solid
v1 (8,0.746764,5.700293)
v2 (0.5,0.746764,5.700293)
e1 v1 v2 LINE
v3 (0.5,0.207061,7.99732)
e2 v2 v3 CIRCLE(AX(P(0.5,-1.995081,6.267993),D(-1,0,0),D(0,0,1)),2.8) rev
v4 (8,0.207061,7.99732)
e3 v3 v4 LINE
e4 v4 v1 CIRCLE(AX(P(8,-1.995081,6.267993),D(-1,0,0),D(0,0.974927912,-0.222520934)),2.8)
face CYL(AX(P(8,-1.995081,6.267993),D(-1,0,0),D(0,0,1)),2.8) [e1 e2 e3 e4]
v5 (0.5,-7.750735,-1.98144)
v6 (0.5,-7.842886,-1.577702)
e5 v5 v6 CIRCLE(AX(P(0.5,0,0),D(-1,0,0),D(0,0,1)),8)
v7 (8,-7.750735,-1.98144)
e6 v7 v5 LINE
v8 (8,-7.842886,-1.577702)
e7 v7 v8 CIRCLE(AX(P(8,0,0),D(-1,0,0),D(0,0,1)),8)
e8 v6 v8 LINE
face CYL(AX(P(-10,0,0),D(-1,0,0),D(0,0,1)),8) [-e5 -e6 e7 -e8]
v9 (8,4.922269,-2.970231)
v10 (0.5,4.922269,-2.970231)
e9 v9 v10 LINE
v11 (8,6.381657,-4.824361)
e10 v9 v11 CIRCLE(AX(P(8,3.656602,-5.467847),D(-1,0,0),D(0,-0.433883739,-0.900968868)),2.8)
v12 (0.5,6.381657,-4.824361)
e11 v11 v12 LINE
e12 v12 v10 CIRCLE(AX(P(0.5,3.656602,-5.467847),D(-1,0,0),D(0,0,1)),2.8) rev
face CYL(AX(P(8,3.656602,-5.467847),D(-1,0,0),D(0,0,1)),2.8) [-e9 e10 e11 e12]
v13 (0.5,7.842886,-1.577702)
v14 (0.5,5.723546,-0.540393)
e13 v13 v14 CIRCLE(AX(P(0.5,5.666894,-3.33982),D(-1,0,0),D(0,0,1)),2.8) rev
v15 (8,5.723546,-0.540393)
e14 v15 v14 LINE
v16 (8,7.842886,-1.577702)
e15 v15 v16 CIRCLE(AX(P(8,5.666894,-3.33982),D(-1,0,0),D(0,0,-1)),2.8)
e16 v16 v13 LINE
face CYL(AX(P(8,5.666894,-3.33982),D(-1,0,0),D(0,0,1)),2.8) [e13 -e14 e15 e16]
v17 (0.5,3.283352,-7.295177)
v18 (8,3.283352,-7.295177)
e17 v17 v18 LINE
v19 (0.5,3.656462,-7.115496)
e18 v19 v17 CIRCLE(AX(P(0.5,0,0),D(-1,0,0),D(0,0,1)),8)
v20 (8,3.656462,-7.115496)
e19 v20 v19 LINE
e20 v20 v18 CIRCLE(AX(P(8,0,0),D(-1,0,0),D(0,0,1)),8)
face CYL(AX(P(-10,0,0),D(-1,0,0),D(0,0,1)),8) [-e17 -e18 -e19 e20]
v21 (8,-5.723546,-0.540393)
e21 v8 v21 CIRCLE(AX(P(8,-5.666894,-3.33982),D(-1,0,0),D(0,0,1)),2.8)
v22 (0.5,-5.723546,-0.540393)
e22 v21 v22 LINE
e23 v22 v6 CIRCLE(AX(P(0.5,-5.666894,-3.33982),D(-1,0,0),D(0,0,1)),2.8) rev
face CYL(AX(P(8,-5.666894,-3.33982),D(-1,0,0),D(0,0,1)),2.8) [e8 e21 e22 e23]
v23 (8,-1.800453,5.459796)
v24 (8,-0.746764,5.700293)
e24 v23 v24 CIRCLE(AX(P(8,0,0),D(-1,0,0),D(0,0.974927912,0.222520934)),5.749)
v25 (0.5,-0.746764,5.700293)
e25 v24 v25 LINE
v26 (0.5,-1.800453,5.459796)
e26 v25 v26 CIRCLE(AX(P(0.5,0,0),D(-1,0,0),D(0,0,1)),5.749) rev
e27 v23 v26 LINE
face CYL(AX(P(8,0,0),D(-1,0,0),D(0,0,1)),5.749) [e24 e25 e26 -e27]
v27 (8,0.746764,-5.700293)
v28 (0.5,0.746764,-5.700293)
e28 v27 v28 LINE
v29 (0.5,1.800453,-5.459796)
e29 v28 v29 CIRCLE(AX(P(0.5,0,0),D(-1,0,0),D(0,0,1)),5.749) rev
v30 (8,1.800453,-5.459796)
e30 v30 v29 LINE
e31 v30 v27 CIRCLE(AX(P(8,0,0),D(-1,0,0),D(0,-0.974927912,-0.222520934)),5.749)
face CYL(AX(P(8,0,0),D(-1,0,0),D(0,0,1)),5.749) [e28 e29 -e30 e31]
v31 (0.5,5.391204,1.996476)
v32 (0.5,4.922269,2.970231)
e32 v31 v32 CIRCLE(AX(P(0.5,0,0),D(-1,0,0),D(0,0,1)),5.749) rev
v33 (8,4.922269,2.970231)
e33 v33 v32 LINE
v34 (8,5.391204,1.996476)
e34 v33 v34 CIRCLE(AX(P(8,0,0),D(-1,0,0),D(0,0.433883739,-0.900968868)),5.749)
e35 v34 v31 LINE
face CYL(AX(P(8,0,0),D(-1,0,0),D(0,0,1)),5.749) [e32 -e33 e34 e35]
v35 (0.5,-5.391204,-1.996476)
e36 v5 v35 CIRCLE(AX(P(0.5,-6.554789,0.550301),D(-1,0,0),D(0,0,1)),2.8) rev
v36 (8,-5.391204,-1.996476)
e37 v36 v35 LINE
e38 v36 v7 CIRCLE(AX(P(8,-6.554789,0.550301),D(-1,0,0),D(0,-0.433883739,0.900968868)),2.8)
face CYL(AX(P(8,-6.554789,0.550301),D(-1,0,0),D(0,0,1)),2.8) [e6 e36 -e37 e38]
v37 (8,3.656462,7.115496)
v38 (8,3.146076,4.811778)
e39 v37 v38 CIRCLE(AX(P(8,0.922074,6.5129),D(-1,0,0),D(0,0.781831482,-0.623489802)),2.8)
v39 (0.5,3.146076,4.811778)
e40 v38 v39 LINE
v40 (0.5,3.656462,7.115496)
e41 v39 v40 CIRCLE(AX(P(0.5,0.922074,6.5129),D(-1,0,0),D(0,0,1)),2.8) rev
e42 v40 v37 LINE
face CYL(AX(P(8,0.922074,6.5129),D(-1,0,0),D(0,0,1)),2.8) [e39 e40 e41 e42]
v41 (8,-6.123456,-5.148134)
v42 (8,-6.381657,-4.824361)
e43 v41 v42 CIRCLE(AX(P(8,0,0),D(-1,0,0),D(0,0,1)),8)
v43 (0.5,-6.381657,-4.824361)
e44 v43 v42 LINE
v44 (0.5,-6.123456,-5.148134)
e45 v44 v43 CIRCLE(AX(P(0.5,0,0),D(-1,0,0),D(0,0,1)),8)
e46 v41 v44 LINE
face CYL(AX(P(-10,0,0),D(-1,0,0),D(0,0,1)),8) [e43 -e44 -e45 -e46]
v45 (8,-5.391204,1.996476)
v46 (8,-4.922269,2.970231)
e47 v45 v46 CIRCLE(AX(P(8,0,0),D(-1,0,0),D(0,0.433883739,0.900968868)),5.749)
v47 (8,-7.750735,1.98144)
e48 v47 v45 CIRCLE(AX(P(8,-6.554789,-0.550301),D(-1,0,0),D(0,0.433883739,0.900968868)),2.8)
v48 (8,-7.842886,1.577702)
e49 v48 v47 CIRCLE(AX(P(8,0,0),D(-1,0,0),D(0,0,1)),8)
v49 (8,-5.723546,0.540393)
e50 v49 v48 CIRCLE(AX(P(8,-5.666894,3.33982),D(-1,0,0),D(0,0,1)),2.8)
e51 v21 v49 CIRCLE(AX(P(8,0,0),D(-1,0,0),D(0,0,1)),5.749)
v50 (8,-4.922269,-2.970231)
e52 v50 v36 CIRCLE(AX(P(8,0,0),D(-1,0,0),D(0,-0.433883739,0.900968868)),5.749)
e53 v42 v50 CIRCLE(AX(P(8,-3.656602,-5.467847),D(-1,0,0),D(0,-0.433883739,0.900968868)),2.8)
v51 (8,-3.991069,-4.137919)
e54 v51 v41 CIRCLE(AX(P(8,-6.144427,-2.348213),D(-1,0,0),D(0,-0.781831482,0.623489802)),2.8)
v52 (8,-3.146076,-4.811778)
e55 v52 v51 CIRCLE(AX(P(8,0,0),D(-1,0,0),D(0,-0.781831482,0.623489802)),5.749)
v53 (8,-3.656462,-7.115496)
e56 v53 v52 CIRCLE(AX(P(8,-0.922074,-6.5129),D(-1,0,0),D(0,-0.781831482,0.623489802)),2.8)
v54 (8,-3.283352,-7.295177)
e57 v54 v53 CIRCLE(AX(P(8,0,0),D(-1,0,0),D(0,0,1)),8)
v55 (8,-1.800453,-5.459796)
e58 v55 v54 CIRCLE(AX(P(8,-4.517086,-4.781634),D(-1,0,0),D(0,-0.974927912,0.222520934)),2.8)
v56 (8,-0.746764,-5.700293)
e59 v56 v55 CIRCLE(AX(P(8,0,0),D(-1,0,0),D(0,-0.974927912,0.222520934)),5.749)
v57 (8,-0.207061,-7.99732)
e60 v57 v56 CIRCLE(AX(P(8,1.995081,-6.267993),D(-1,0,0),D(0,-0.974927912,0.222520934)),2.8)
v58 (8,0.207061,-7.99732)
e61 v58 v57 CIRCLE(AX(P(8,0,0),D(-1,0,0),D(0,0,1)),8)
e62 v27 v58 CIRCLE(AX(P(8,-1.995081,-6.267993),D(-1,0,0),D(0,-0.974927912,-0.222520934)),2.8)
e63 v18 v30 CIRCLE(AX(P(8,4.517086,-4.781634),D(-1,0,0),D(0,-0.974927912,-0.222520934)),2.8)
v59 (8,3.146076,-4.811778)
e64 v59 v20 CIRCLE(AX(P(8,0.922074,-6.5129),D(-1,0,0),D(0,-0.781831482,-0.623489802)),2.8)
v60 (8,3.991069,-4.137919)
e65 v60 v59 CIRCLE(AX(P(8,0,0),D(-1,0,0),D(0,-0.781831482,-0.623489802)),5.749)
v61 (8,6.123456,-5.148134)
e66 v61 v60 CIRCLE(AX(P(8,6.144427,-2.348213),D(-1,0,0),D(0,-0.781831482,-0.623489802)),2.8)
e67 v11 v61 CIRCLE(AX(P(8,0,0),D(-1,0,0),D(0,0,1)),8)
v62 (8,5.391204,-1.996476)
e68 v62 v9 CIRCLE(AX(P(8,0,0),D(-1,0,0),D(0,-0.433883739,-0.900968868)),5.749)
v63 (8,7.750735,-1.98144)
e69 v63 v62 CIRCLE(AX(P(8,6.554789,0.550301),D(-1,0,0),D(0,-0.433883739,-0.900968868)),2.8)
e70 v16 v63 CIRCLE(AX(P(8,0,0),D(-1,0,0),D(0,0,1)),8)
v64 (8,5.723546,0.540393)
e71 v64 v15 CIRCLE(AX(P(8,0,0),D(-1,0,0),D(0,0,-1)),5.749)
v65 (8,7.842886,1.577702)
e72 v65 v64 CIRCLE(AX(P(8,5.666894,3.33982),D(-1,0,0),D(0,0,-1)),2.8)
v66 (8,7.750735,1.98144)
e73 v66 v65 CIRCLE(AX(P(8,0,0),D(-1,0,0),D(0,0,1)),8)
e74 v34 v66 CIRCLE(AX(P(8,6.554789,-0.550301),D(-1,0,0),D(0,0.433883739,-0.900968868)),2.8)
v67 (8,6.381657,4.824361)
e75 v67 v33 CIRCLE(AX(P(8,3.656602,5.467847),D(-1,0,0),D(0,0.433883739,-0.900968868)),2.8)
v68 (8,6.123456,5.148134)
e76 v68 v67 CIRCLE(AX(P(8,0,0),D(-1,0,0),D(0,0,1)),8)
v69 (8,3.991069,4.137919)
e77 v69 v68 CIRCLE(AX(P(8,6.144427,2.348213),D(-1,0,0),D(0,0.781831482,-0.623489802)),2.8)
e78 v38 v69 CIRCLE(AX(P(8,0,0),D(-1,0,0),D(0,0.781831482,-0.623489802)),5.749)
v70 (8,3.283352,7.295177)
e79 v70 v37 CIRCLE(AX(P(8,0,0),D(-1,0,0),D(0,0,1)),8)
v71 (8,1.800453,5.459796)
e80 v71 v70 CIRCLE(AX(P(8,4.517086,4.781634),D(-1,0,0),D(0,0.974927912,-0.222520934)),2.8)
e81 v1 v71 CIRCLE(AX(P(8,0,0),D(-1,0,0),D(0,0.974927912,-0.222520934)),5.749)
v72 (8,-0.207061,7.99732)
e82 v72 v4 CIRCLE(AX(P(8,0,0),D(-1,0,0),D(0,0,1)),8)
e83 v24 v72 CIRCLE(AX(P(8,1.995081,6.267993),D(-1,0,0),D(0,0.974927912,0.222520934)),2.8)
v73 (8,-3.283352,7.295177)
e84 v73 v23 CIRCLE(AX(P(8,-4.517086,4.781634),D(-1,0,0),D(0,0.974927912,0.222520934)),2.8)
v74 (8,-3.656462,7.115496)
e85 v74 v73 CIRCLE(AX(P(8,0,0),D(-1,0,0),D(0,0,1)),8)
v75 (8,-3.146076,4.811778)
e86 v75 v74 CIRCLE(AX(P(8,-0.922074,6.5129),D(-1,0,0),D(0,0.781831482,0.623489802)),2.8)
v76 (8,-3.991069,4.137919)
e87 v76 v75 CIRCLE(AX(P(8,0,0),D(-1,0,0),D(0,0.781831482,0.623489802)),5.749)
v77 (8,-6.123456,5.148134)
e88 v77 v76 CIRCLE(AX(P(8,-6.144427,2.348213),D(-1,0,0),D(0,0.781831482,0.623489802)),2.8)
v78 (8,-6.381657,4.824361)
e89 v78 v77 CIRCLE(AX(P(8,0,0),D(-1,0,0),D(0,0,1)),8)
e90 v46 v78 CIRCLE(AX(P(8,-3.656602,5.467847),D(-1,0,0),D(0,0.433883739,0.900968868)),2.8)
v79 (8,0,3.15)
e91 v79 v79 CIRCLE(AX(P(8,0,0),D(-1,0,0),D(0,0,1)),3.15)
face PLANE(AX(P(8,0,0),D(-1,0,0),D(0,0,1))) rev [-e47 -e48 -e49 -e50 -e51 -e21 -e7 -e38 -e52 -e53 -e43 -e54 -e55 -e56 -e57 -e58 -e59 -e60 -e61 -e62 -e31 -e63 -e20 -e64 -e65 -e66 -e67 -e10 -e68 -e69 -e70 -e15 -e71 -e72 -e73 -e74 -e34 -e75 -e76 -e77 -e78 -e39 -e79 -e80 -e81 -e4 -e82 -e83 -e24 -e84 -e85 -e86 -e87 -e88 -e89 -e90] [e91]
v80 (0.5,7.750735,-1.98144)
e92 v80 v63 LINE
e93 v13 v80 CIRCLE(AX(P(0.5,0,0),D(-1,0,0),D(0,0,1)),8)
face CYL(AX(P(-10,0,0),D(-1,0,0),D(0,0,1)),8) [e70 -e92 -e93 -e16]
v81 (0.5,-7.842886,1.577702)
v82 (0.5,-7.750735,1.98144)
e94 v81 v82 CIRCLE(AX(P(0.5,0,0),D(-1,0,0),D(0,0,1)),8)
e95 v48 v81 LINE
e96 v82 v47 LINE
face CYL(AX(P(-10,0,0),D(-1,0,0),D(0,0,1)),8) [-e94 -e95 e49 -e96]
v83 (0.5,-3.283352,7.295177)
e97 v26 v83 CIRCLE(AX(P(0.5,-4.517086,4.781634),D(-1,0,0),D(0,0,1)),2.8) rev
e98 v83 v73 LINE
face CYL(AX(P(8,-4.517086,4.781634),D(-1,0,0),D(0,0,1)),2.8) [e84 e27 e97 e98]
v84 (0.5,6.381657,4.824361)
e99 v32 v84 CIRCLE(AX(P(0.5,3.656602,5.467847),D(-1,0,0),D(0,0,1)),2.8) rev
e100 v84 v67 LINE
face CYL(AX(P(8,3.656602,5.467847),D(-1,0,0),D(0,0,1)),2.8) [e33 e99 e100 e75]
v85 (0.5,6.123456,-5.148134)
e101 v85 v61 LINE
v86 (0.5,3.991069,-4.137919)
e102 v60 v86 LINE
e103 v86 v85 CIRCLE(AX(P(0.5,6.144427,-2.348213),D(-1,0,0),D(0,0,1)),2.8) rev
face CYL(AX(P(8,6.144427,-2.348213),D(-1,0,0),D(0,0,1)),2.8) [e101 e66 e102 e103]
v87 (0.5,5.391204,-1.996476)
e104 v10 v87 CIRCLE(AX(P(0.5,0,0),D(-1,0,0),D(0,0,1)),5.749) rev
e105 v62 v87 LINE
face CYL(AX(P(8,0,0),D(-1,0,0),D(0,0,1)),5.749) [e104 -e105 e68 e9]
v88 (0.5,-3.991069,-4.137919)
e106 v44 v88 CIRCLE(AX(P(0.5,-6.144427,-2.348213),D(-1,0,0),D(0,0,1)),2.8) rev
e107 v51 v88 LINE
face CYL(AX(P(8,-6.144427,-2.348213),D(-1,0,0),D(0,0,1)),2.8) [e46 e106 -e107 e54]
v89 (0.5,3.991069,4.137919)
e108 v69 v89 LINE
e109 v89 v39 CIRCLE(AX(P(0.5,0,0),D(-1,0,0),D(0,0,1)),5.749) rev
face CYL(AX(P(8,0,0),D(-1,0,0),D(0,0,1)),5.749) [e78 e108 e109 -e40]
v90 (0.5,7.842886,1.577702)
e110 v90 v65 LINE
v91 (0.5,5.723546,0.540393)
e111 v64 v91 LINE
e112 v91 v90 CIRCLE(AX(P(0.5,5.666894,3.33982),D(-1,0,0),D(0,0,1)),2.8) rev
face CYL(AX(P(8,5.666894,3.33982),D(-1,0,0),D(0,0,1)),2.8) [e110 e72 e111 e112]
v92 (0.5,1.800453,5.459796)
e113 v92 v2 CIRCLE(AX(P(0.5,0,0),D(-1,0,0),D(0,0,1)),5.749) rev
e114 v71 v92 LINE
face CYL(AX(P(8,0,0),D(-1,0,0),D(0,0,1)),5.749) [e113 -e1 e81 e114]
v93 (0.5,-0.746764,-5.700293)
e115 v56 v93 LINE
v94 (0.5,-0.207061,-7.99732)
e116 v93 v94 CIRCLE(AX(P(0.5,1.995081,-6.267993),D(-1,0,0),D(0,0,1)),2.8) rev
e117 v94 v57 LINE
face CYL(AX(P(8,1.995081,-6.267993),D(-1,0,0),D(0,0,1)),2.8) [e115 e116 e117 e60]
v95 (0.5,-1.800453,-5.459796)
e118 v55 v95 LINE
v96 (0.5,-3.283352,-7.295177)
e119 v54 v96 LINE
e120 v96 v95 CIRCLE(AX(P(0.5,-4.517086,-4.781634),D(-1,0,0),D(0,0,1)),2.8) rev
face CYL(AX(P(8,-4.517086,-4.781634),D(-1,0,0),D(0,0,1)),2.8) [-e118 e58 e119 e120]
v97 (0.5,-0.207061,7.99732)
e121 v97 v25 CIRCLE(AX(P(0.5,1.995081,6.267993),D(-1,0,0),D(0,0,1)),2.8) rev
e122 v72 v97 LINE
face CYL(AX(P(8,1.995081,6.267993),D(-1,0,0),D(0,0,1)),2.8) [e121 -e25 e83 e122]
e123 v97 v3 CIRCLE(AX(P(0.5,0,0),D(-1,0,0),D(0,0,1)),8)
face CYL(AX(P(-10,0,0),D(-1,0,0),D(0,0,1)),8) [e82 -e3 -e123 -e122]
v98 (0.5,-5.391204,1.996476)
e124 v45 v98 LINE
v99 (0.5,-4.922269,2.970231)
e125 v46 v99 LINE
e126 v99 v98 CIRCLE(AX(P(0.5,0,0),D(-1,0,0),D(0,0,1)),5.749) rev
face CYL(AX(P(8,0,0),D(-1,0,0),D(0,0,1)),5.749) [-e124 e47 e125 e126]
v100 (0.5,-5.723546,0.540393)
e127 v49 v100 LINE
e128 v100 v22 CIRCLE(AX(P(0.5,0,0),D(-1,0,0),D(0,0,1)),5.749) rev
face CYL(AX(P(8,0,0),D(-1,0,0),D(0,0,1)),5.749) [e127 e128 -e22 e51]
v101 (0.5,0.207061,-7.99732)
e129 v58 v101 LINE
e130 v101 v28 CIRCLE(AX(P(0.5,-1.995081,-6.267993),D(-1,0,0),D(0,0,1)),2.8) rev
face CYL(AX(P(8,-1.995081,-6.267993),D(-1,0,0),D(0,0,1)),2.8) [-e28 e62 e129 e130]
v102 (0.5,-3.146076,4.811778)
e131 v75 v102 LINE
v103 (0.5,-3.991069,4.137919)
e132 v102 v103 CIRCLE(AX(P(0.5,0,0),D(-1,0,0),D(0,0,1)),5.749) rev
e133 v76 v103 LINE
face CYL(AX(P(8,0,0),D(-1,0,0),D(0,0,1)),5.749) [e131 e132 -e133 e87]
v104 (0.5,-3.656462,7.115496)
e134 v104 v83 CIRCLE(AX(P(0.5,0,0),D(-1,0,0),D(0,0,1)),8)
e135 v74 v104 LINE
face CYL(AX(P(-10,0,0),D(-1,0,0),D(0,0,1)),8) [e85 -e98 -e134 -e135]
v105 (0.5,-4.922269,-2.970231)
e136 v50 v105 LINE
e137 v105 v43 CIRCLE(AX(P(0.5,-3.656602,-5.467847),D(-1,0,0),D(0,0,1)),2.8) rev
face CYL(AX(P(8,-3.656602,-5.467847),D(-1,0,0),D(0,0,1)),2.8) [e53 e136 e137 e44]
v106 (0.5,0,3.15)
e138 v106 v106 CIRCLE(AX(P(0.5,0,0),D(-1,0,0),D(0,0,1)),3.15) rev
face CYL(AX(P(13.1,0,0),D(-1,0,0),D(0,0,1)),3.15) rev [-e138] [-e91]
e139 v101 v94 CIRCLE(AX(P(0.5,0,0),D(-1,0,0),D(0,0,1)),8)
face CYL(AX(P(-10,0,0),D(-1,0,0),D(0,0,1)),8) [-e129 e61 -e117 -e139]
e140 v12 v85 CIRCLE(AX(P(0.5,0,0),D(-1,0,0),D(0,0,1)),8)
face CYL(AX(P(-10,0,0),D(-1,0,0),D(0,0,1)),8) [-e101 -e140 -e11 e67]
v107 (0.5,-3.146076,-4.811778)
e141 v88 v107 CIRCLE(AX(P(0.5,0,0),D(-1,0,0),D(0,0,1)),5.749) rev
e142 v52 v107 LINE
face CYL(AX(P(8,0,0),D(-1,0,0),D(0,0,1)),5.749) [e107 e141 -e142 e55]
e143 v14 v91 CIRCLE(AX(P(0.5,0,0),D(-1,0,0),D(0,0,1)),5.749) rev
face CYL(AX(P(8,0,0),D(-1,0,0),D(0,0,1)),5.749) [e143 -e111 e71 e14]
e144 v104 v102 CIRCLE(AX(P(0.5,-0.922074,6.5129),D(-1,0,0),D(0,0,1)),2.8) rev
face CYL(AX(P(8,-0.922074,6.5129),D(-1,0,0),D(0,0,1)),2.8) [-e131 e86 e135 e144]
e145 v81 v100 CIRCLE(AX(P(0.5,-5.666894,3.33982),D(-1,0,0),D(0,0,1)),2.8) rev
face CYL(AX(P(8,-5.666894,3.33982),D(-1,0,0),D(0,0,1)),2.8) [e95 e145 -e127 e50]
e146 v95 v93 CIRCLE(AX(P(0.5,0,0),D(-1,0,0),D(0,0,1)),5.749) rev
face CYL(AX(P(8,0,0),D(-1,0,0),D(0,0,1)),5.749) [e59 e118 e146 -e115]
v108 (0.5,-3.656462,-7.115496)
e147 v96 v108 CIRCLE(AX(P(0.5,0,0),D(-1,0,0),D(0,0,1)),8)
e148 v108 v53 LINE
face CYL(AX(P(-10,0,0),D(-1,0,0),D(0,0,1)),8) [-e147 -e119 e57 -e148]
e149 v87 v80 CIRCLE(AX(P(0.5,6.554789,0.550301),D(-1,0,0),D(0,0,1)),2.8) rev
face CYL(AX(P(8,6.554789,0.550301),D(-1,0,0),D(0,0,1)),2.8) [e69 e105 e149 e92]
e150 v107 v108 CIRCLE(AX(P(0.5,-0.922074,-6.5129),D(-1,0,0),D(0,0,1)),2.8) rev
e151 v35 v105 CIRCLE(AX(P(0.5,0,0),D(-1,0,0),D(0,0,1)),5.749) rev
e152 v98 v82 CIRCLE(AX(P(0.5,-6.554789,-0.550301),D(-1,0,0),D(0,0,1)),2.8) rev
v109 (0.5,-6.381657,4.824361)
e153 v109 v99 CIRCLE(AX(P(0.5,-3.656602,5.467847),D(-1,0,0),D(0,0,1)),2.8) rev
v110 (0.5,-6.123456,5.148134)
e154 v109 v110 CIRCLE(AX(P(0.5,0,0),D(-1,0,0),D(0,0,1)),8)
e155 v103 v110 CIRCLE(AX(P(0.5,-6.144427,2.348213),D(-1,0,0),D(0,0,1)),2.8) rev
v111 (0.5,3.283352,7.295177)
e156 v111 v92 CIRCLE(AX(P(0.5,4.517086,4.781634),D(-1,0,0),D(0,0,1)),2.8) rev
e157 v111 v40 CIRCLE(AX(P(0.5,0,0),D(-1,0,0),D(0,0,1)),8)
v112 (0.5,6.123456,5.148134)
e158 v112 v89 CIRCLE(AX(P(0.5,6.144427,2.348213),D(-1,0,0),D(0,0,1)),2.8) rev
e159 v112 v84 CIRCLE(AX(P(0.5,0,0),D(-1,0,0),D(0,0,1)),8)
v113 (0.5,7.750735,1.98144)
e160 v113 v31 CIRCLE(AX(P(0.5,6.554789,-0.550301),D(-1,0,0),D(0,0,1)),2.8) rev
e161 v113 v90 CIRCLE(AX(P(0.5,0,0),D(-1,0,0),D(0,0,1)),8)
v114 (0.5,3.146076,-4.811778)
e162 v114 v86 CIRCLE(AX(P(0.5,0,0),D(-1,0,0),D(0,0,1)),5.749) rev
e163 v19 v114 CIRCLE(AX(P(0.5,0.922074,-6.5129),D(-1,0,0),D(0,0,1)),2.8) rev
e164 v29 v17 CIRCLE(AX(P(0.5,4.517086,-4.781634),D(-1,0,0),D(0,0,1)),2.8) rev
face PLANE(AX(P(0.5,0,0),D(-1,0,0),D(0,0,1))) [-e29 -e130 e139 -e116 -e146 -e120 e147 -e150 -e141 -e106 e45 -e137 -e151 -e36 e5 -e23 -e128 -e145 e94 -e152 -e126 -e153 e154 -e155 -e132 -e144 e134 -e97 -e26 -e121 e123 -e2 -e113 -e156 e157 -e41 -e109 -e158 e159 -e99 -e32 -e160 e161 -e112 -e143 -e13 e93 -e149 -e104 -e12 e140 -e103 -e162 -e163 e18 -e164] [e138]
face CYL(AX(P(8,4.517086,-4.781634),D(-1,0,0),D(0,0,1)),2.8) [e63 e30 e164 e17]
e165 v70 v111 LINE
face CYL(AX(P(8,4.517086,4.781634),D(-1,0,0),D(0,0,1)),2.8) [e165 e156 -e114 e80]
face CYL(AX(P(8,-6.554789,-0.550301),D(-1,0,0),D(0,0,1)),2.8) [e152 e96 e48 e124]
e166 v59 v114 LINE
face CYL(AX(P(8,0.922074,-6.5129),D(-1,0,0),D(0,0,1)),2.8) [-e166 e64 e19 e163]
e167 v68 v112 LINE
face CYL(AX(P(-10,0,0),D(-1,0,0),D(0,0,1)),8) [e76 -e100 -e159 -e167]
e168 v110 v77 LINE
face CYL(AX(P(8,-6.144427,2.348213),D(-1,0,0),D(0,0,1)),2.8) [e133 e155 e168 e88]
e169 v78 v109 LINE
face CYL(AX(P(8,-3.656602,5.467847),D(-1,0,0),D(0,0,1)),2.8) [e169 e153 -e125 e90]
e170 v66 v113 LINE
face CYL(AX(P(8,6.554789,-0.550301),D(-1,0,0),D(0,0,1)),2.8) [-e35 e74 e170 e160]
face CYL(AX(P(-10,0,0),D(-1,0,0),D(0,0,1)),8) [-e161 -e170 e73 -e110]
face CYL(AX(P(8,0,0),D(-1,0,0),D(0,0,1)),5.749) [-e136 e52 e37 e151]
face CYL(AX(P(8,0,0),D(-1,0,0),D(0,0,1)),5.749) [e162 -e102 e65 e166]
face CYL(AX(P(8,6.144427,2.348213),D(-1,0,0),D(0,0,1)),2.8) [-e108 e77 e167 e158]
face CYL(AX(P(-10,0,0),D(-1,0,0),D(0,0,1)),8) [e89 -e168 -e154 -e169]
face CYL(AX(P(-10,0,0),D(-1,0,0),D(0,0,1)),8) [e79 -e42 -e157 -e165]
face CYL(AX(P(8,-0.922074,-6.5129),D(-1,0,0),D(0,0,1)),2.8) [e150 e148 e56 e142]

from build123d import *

# Parameters (mm, degrees)
BOSS_EXTRUDE1_START       = -4.9
BOSS_EXTRUDE1_DEPTH       = 4.9
BOSS_EXTRUDE1_START_2     = -8
BOSS_EXTRUDE1_2_OUTLINE_R = 5
BOSS_EXTRUDE1_2_DEPTH     = 3.1
SKETCH2_R                 = 5.05
CUT_EXTRUDE1_DEPTH        = 3.1
SKETCH3_R                 = 3.25
CUT_EXTRUDE2_DEPTH        = 13.227872143
SKETCH4_R                 = 4
CUT_EXTRUDE3_DEPTH        = 10
SKETCH5_R                 = 4
SKETCH5_R_2               = 3
BOSS_EXTRUDE2_DEPTH       = 4.9
BOSS_EXTRUDE3_DEPTH       = 1
BOSS_EXTRUDE3_DEPTH_BACK  = 1
FILLET1_R                 = 1
SKETCH8_R                 = 3.15
CUT_EXTRUDE4_DEPTH        = 10
BOSS_EXTRUDE4_START       = 3.1
SKETCH9_R                 = 5.05
SKETCH9_R_2               = 3.15
BOSS_EXTRUDE4_DEPTH       = 3.1
SKETCH10_R                = 9.67908905
CUT_EXTRUDE5_DEPTH        = 0.5


with BuildPart() as part:
    # Boss-Extrude1: read off the stored shape, not the designer's step
    # Boss-Extrude1 outline → Boss-Extrude1 (new body)
    with BuildSketch(Plane(origin=(8, 0, 0), x_dir=(0, 0, -1), z_dir=(1, 0, 0)).offset(BOSS_EXTRUDE1_START)):
        with BuildLine():
            ThreePointArc((-7.295176575, -3.283351754), (-7.207750943, -3.471069913), (-7.115495966, -3.656462382))
            ThreePointArc((-7.115495966, -3.656462382), (-5.907248739, -3.655787226), (-4.811777955, -3.146075955))
            ThreePointArc((-4.811777955, -3.146075955), (-4.494749193, -3.584442871), (-4.137918587, -3.991068875))
            ThreePointArc((-4.137918587, -3.991068875), (-4.878615514, -4.945652492), (-5.148134044, -6.123456202))
            ThreePointArc((-5.148134044, -6.123456202), (-4.987918415, -6.25465186), (-4.824360775, -6.381656769))
            ThreePointArc((-4.824360775, -6.381656769), (-3.736060578, -5.856809649), (-2.970230937, -4.922268702))
            ThreePointArc((-2.970230937, -4.922268702), (-2.494397616, -5.179670022), (-1.996475938, -5.391204395))
            ThreePointArc((-1.996475938, -5.391204395), (-2.249642501, -6.572630868), (-1.981440428, -7.750735051))
            ThreePointArc((-1.981440428, -7.750735051), (-1.780167471, -7.799423297), (-1.577701765, -7.842885766))
            ThreePointArc((-1.577701765, -7.842885766), (-0.824899799, -6.897819092), (-0.540393256, -5.723545765))
            ThreePointArc((-0.540393256, -5.723545765), (0, -5.749), (0.540393256, -5.723545765))
            ThreePointArc((0.540393256, -5.723545765), (0.824899799, -6.897819092), (1.577701765, -7.842885766))
            ThreePointArc((1.577701765, -7.842885766), (1.780167471, -7.799423297), (1.981440428, -7.750735051))
            ThreePointArc((1.981440428, -7.750735051), (2.249642501, -6.572630868), (1.996475938, -5.391204395))
            ThreePointArc((1.996475938, -5.391204395), (2.494397616, -5.179670022), (2.970230937, -4.922268702))
            ThreePointArc((2.970230937, -4.922268702), (3.736060578, -5.856809649), (4.824360775, -6.381656769))
            ThreePointArc((4.824360775, -6.381656769), (4.987918415, -6.25465186), (5.148134044, -6.123456202))
            ThreePointArc((5.148134044, -6.123456202), (4.878615514, -4.945652492), (4.137918587, -3.991068875))
            ThreePointArc((4.137918587, -3.991068875), (4.494749193, -3.584442871), (4.811777955, -3.146075955))
            ThreePointArc((4.811777955, -3.146075955), (5.907248739, -3.655787226), (7.115495966, -3.656462382))
            ThreePointArc((7.115495966, -3.656462382), (7.207750943, -3.471069913), (7.295176575, -3.283351754))
            ThreePointArc((7.295176575, -3.283351754), (6.541318892, -2.339126986), (5.459795711, -1.800453218))
            ThreePointArc((5.459795711, -1.800453218), (5.604860567, -1.27927285), (5.700293335, -0.746764281))
            ThreePointArc((5.700293335, -0.746764281), (6.90843384, -0.730691307), (7.997319916, -0.207060777))
            ThreePointArc((7.997319916, -0.207060777), (8, 0), (7.997319916, 0.207060777))
            ThreePointArc((7.997319916, 0.207060777), (6.90843384, 0.730691307), (5.700293335, 0.746764281))
            ThreePointArc((5.700293335, 0.746764281), (5.604860567, 1.27927285), (5.459795711, 1.800453218))
            ThreePointArc((5.459795711, 1.800453218), (6.541318892, 2.339126986), (7.295176575, 3.283351754))
            ThreePointArc((7.295176575, 3.283351754), (7.207750943, 3.471069913), (7.115495966, 3.656462382))
            ThreePointArc((7.115495966, 3.656462382), (5.907248739, 3.655787226), (4.811777955, 3.146075955))
            ThreePointArc((4.811777955, 3.146075955), (4.494749193, 3.584442871), (4.137918587, 3.991068875))
            ThreePointArc((4.137918587, 3.991068875), (4.878615514, 4.945652492), (5.148134044, 6.123456202))
            ThreePointArc((5.148134044, 6.123456202), (4.987918415, 6.25465186), (4.824360775, 6.381656769))
            ThreePointArc((4.824360775, 6.381656769), (3.736060578, 5.856809649), (2.970230937, 4.922268702))
            ThreePointArc((2.970230937, 4.922268702), (2.494397616, 5.179670022), (1.996475938, 5.391204395))
            ThreePointArc((1.996475938, 5.391204395), (2.249642501, 6.572630868), (1.981440428, 7.750735051))
            ThreePointArc((1.981440428, 7.750735051), (1.780167471, 7.799423297), (1.577701765, 7.842885766))
            ThreePointArc((1.577701765, 7.842885766), (0.824899799, 6.897819092), (0.540393256, 5.723545765))
            ThreePointArc((0.540393256, 5.723545765), (0, 5.749), (-0.540393256, 5.723545765))
            ThreePointArc((-0.540393256, 5.723545765), (-0.824899799, 6.897819092), (-1.577701765, 7.842885766))
            ThreePointArc((-1.577701765, 7.842885766), (-1.780167471, 7.799423297), (-1.981440428, 7.750735051))
            ThreePointArc((-1.981440428, 7.750735051), (-2.249642501, 6.572630868), (-1.996475938, 5.391204395))
            ThreePointArc((-1.996475938, 5.391204395), (-2.494397616, 5.179670022), (-2.970230937, 4.922268702))
            ThreePointArc((-2.970230937, 4.922268702), (-3.736060578, 5.856809649), (-4.824360775, 6.381656769))
            ThreePointArc((-4.824360775, 6.381656769), (-4.987918415, 6.25465186), (-5.148134044, 6.123456202))
            ThreePointArc((-5.148134044, 6.123456202), (-4.878615514, 4.945652492), (-4.137918587, 3.991068875))
            ThreePointArc((-4.137918587, 3.991068875), (-4.494749193, 3.584442871), (-4.811777955, 3.146075955))
            ThreePointArc((-4.811777955, 3.146075955), (-5.907248739, 3.655787226), (-7.115495966, 3.656462382))
            ThreePointArc((-7.115495966, 3.656462382), (-7.207750943, 3.471069913), (-7.295176575, 3.283351754))
            ThreePointArc((-7.295176575, 3.283351754), (-6.541318892, 2.339126986), (-5.459795711, 1.800453218))
            ThreePointArc((-5.459795711, 1.800453218), (-5.604860567, 1.27927285), (-5.700293335, 0.746764281))
            ThreePointArc((-5.700293335, 0.746764281), (-6.90843384, 0.730691307), (-7.997319916, 0.207060777))
            ThreePointArc((-7.997319916, 0.207060777), (-8, 0), (-7.997319916, -0.207060777))
            ThreePointArc((-7.997319916, -0.207060777), (-6.90843384, -0.730691307), (-5.700293335, -0.746764281))
            ThreePointArc((-5.700293335, -0.746764281), (-5.604860567, -1.27927285), (-5.459795711, -1.800453218))
            ThreePointArc((-5.459795711, -1.800453218), (-6.541318892, -2.339126986), (-7.295176575, -3.283351754))
        make_face()
    extrude(amount=BOSS_EXTRUDE1_DEPTH)

    # Boss-Extrude1 2 outline → Boss-Extrude1 2 (add)
    with BuildSketch(Plane(origin=(8, 0, 0), x_dir=(0, 0, -1), z_dir=(1, 0, 0)).offset(BOSS_EXTRUDE1_START_2)):
        with BuildLine():
            ThreePointArc((-7.295176575, -3.283351754), (-7.207750943, -3.471069913), (-7.115495966, -3.656462382))
            ThreePointArc((-7.115495966, -3.656462382), (-5.907248739, -3.655787226), (-4.811777955, -3.146075955))
            ThreePointArc((-4.811777955, -3.146075955), (-4.494749193, -3.584442871), (-4.137918587, -3.991068875))
            ThreePointArc((-4.137918587, -3.991068875), (-4.878615514, -4.945652492), (-5.148134044, -6.123456202))
            ThreePointArc((-5.148134044, -6.123456202), (-4.987918415, -6.25465186), (-4.824360775, -6.381656769))
            ThreePointArc((-4.824360775, -6.381656769), (-3.736060578, -5.856809649), (-2.970230937, -4.922268702))
            ThreePointArc((-2.970230937, -4.922268702), (-2.494397616, -5.179670022), (-1.996475938, -5.391204395))
            ThreePointArc((-1.996475938, -5.391204395), (-2.249642501, -6.572630868), (-1.981440428, -7.750735051))
            ThreePointArc((-1.981440428, -7.750735051), (-1.780167471, -7.799423297), (-1.577701765, -7.842885766))
            ThreePointArc((-1.577701765, -7.842885766), (-0.824899799, -6.897819092), (-0.540393256, -5.723545765))
            ThreePointArc((-0.540393256, -5.723545765), (0, -5.749), (0.540393256, -5.723545765))
            ThreePointArc((0.540393256, -5.723545765), (0.824899799, -6.897819092), (1.577701765, -7.842885766))
            ThreePointArc((1.577701765, -7.842885766), (1.780167471, -7.799423297), (1.981440428, -7.750735051))
            ThreePointArc((1.981440428, -7.750735051), (2.249642501, -6.572630868), (1.996475938, -5.391204395))
            ThreePointArc((1.996475938, -5.391204395), (2.494397616, -5.179670022), (2.970230937, -4.922268702))
            ThreePointArc((2.970230937, -4.922268702), (3.736060578, -5.856809649), (4.824360775, -6.381656769))
            ThreePointArc((4.824360775, -6.381656769), (4.987918415, -6.25465186), (5.148134044, -6.123456202))
            ThreePointArc((5.148134044, -6.123456202), (4.878615514, -4.945652492), (4.137918587, -3.991068875))
            ThreePointArc((4.137918587, -3.991068875), (4.494749193, -3.584442871), (4.811777955, -3.146075955))
            ThreePointArc((4.811777955, -3.146075955), (5.907248739, -3.655787226), (7.115495966, -3.656462382))
            ThreePointArc((7.115495966, -3.656462382), (7.207750943, -3.471069913), (7.295176575, -3.283351754))
            ThreePointArc((7.295176575, -3.283351754), (6.541318892, -2.339126986), (5.459795711, -1.800453218))
            ThreePointArc((5.459795711, -1.800453218), (5.604860567, -1.27927285), (5.700293335, -0.746764281))
            ThreePointArc((5.700293335, -0.746764281), (6.90843384, -0.730691307), (7.997319916, -0.207060777))
            ThreePointArc((7.997319916, -0.207060777), (8, 0), (7.997319916, 0.207060777))
            ThreePointArc((7.997319916, 0.207060777), (6.90843384, 0.730691307), (5.700293335, 0.746764281))
            ThreePointArc((5.700293335, 0.746764281), (5.604860567, 1.27927285), (5.459795711, 1.800453218))
            ThreePointArc((5.459795711, 1.800453218), (6.541318892, 2.339126986), (7.295176575, 3.283351754))
            ThreePointArc((7.295176575, 3.283351754), (7.207750943, 3.471069913), (7.115495966, 3.656462382))
            ThreePointArc((7.115495966, 3.656462382), (5.907248739, 3.655787226), (4.811777955, 3.146075955))
            ThreePointArc((4.811777955, 3.146075955), (4.494749193, 3.584442871), (4.137918587, 3.991068875))
            ThreePointArc((4.137918587, 3.991068875), (4.878615514, 4.945652492), (5.148134044, 6.123456202))
            ThreePointArc((5.148134044, 6.123456202), (4.987918415, 6.25465186), (4.824360775, 6.381656769))
            ThreePointArc((4.824360775, 6.381656769), (3.736060578, 5.856809649), (2.970230937, 4.922268702))
            ThreePointArc((2.970230937, 4.922268702), (2.494397616, 5.179670022), (1.996475938, 5.391204395))
            ThreePointArc((1.996475938, 5.391204395), (2.249642501, 6.572630868), (1.981440428, 7.750735051))
            ThreePointArc((1.981440428, 7.750735051), (1.780167471, 7.799423297), (1.577701765, 7.842885766))
            ThreePointArc((1.577701765, 7.842885766), (0.824899799, 6.897819092), (0.540393256, 5.723545765))
            ThreePointArc((0.540393256, 5.723545765), (0, 5.749), (-0.540393256, 5.723545765))
            ThreePointArc((-0.540393256, 5.723545765), (-0.824899799, 6.897819092), (-1.577701765, 7.842885766))
            ThreePointArc((-1.577701765, 7.842885766), (-1.780167471, 7.799423297), (-1.981440428, 7.750735051))
            ThreePointArc((-1.981440428, 7.750735051), (-2.249642501, 6.572630868), (-1.996475938, 5.391204395))
            ThreePointArc((-1.996475938, 5.391204395), (-2.494397616, 5.179670022), (-2.970230937, 4.922268702))
            ThreePointArc((-2.970230937, 4.922268702), (-3.736060578, 5.856809649), (-4.824360775, 6.381656769))
            ThreePointArc((-4.824360775, 6.381656769), (-4.987918415, 6.25465186), (-5.148134044, 6.123456202))
            ThreePointArc((-5.148134044, 6.123456202), (-4.878615514, 4.945652492), (-4.137918587, 3.991068875))
            ThreePointArc((-4.137918587, 3.991068875), (-4.494749193, 3.584442871), (-4.811777955, 3.146075955))
            ThreePointArc((-4.811777955, 3.146075955), (-5.907248739, 3.655787226), (-7.115495966, 3.656462382))
            ThreePointArc((-7.115495966, 3.656462382), (-7.207750943, 3.471069913), (-7.295176575, 3.283351754))
            ThreePointArc((-7.295176575, 3.283351754), (-6.541318892, 2.339126986), (-5.459795711, 1.800453218))
            ThreePointArc((-5.459795711, 1.800453218), (-5.604860567, 1.27927285), (-5.700293335, 0.746764281))
            ThreePointArc((-5.700293335, 0.746764281), (-6.90843384, 0.730691307), (-7.997319916, 0.207060777))
            ThreePointArc((-7.997319916, 0.207060777), (-8, 0), (-7.997319916, -0.207060777))
            ThreePointArc((-7.997319916, -0.207060777), (-6.90843384, -0.730691307), (-5.700293335, -0.746764281))
            ThreePointArc((-5.700293335, -0.746764281), (-5.604860567, -1.27927285), (-5.459795711, -1.800453218))
            ThreePointArc((-5.459795711, -1.800453218), (-6.541318892, -2.339126986), (-7.295176575, -3.283351754))
        make_face()
        Circle(BOSS_EXTRUDE1_2_OUTLINE_R, mode=Mode.SUBTRACT)
    extrude(amount=BOSS_EXTRUDE1_2_DEPTH)

    # Sketch2 → Cut-Extrude1 (cut)
    with BuildSketch(Plane.ZY):
        Circle(SKETCH2_R)
    extrude(amount=-CUT_EXTRUDE1_DEPTH, mode=Mode.SUBTRACT)

    # Sketch3 → Cut-Extrude2 (cut, through all)
    with BuildSketch(Plane.ZY.offset(-3.1)):
        Circle(SKETCH3_R)
    extrude(amount=-CUT_EXTRUDE2_DEPTH, mode=Mode.SUBTRACT)

    # Sketch4 → Cut-Extrude3 (cut)
    with BuildSketch(Plane(origin=(8, 0, 0), x_dir=(0, 0, -1), z_dir=(1, 0, 0))):
        Circle(SKETCH4_R)
    extrude(amount=-CUT_EXTRUDE3_DEPTH, mode=Mode.SUBTRACT)

    # Sketch5 → Boss-Extrude2 (add)
    with BuildSketch(Plane(origin=(8, 0, 0), x_dir=(0, 0, -1), z_dir=(1, 0, 0))):
        Circle(SKETCH5_R)
        Circle(SKETCH5_R_2, mode=Mode.SUBTRACT)
    extrude(amount=-BOSS_EXTRUDE2_DEPTH)

    # Sketch7 → Boss-Extrude3 (add, two sides: drawn at the far end of the back side and taken through both)
    with BuildSketch(Plane.ZY.offset(-1.6).offset(-BOSS_EXTRUDE3_DEPTH_BACK)):
        with BuildLine():
            ThreePointArc((5.096691895, -0.934506311), (5.181657101, 0), (5.096691895, 0.934506311))
            ThreePointArc((5.096691895, 0.934506311), (4.95, 0), (5.096691895, -0.934506311))
        make_face()
        with BuildLine():
            ThreePointArc((-5.096691895, -0.934506311), (-4.95, 0), (-5.096691895, 0.934506311))
            ThreePointArc((-5.096691895, 0.934506311), (-5.181657101, 0), (-5.096691895, -0.934506311))
        make_face()
    extrude(amount=BOSS_EXTRUDE3_DEPTH + BOSS_EXTRUDE3_DEPTH_BACK)

    # Fillet1
    # the kernel refuses this fillet: 1 mm, written as the material it takes off along each edge
    with BuildSketch(Plane(origin=(0.6, 0, 8), x_dir=(0, 0.853406197512974, -0.5212464503921795), z_dir=(0, 0.5212464503921795, 0.853406197512974))) as fillet1_piece_1_section:
        with BuildLine():
            CenterArc((3.05 - FILLET1_R, -FILLET1_R), FILLET1_R, 0, 90)
            Line((3.05, -FILLET1_R), (3.05, 0))
            Line((3.05, 0), (3.05 - FILLET1_R, 0))
        make_face()
    fillet1_piece_1 = revolve(axis=Axis((0.6, 0, 8), (-1, 0, 0)), revolution_arc=117.16820376, mode=Mode.PRIVATE)
    fillet1_piece_1 = fillet1_piece_1 & Plane(origin=(0.6, 0, 0), x_dir=(0, 0, 1), z_dir=(-1, 0, 0)) * Cylinder(5.05, 13, mode=Mode.PRIVATE)
    add(fillet1_piece_1, mode=Mode.SUBTRACT)
    with BuildSketch(Plane(origin=(0.6, 0, -8), x_dir=(0, -0.8534061975130341, 0.521246450392081), z_dir=(0, -0.521246450392081, -0.8534061975130341))) as fillet1_piece_2_section:
        with BuildLine():
            CenterArc((3.05 - FILLET1_R, -FILLET1_R), FILLET1_R, 0, 90)
            Line((3.05 - FILLET1_R, 0), (3.05, 0))
            Line((3.05, 0), (3.05, -FILLET1_R))
        make_face()
    fillet1_piece_2 = revolve(axis=Axis((0.6, 0, -8), (-1, 0, 0)), revolution_arc=117.16820376, mode=Mode.PRIVATE)
    fillet1_piece_2 = fillet1_piece_2 & Plane(origin=(0.6, 0, 0), x_dir=(0, 0, 1), z_dir=(-1, 0, 0)) * Cylinder(5.05, 13, mode=Mode.PRIVATE)
    add(fillet1_piece_2, mode=Mode.SUBTRACT)
    with BuildSketch(Plane(origin=(2.6, 0, -8), x_dir=(0, -0.8534061975130341, 0.521246450392081), z_dir=(0, -0.521246450392081, -0.8534061975130341))) as fillet1_piece_3_section:
        with BuildLine():
            CenterArc((3.05 - FILLET1_R, FILLET1_R), FILLET1_R, 270, 90)
            Line((3.05 - FILLET1_R, 0), (3.05, 0))
            Line((3.05, 0), (3.05, FILLET1_R))
        make_face()
    fillet1_piece_3 = revolve(axis=Axis((2.6, 0, -8), (-1, 0, 0)), revolution_arc=117.16820376, mode=Mode.PRIVATE)
    fillet1_piece_3 = fillet1_piece_3 & Plane(origin=(2.6, 0, 0), x_dir=(0, 0, 1), z_dir=(-1, 0, 0)) * Cylinder(5.05, 13, mode=Mode.PRIVATE)
    add(fillet1_piece_3, mode=Mode.SUBTRACT)
    with BuildSketch(Plane(origin=(2.6, 0, 8), x_dir=(0, 0.853406197512974, -0.5212464503921795), z_dir=(0, 0.5212464503921795, 0.853406197512974))) as fillet1_piece_4_section:
        with BuildLine():
            CenterArc((3.05 - FILLET1_R, FILLET1_R), FILLET1_R, 270, 90)
            Line((3.05 - FILLET1_R, 0), (3.05, 0))
            Line((3.05, 0), (3.05, FILLET1_R))
        make_face()
    fillet1_piece_4 = revolve(axis=Axis((2.6, 0, 8), (-1, 0, 0)), revolution_arc=117.16820376, mode=Mode.PRIVATE)
    fillet1_piece_4 = fillet1_piece_4 & Plane(origin=(2.6, 0, 0), x_dir=(0, 0, 1), z_dir=(-1, 0, 0)) * Cylinder(5.05, 13, mode=Mode.PRIVATE)
    add(fillet1_piece_4, mode=Mode.SUBTRACT)

    # Sketch8 → Cut-Extrude4 (cut)
    with BuildSketch(Plane.ZY.offset(-3.1)):
        Circle(SKETCH8_R)
    extrude(amount=-CUT_EXTRUDE4_DEPTH, mode=Mode.SUBTRACT)

    # Sketch9 → Boss-Extrude4 (add)
    with BuildSketch(Plane.ZY.offset(-3.1).offset(BOSS_EXTRUDE4_START)):
        Circle(SKETCH9_R)
        Circle(SKETCH9_R_2, mode=Mode.SUBTRACT)
    extrude(amount=-BOSS_EXTRUDE4_DEPTH)

    # Sketch10 → Cut-Extrude5 (cut)
    with BuildSketch(Plane.ZY):
        Circle(SKETCH10_R)
    extrude(amount=-CUT_EXTRUDE5_DEPTH, mode=Mode.SUBTRACT)


solid = part.part
